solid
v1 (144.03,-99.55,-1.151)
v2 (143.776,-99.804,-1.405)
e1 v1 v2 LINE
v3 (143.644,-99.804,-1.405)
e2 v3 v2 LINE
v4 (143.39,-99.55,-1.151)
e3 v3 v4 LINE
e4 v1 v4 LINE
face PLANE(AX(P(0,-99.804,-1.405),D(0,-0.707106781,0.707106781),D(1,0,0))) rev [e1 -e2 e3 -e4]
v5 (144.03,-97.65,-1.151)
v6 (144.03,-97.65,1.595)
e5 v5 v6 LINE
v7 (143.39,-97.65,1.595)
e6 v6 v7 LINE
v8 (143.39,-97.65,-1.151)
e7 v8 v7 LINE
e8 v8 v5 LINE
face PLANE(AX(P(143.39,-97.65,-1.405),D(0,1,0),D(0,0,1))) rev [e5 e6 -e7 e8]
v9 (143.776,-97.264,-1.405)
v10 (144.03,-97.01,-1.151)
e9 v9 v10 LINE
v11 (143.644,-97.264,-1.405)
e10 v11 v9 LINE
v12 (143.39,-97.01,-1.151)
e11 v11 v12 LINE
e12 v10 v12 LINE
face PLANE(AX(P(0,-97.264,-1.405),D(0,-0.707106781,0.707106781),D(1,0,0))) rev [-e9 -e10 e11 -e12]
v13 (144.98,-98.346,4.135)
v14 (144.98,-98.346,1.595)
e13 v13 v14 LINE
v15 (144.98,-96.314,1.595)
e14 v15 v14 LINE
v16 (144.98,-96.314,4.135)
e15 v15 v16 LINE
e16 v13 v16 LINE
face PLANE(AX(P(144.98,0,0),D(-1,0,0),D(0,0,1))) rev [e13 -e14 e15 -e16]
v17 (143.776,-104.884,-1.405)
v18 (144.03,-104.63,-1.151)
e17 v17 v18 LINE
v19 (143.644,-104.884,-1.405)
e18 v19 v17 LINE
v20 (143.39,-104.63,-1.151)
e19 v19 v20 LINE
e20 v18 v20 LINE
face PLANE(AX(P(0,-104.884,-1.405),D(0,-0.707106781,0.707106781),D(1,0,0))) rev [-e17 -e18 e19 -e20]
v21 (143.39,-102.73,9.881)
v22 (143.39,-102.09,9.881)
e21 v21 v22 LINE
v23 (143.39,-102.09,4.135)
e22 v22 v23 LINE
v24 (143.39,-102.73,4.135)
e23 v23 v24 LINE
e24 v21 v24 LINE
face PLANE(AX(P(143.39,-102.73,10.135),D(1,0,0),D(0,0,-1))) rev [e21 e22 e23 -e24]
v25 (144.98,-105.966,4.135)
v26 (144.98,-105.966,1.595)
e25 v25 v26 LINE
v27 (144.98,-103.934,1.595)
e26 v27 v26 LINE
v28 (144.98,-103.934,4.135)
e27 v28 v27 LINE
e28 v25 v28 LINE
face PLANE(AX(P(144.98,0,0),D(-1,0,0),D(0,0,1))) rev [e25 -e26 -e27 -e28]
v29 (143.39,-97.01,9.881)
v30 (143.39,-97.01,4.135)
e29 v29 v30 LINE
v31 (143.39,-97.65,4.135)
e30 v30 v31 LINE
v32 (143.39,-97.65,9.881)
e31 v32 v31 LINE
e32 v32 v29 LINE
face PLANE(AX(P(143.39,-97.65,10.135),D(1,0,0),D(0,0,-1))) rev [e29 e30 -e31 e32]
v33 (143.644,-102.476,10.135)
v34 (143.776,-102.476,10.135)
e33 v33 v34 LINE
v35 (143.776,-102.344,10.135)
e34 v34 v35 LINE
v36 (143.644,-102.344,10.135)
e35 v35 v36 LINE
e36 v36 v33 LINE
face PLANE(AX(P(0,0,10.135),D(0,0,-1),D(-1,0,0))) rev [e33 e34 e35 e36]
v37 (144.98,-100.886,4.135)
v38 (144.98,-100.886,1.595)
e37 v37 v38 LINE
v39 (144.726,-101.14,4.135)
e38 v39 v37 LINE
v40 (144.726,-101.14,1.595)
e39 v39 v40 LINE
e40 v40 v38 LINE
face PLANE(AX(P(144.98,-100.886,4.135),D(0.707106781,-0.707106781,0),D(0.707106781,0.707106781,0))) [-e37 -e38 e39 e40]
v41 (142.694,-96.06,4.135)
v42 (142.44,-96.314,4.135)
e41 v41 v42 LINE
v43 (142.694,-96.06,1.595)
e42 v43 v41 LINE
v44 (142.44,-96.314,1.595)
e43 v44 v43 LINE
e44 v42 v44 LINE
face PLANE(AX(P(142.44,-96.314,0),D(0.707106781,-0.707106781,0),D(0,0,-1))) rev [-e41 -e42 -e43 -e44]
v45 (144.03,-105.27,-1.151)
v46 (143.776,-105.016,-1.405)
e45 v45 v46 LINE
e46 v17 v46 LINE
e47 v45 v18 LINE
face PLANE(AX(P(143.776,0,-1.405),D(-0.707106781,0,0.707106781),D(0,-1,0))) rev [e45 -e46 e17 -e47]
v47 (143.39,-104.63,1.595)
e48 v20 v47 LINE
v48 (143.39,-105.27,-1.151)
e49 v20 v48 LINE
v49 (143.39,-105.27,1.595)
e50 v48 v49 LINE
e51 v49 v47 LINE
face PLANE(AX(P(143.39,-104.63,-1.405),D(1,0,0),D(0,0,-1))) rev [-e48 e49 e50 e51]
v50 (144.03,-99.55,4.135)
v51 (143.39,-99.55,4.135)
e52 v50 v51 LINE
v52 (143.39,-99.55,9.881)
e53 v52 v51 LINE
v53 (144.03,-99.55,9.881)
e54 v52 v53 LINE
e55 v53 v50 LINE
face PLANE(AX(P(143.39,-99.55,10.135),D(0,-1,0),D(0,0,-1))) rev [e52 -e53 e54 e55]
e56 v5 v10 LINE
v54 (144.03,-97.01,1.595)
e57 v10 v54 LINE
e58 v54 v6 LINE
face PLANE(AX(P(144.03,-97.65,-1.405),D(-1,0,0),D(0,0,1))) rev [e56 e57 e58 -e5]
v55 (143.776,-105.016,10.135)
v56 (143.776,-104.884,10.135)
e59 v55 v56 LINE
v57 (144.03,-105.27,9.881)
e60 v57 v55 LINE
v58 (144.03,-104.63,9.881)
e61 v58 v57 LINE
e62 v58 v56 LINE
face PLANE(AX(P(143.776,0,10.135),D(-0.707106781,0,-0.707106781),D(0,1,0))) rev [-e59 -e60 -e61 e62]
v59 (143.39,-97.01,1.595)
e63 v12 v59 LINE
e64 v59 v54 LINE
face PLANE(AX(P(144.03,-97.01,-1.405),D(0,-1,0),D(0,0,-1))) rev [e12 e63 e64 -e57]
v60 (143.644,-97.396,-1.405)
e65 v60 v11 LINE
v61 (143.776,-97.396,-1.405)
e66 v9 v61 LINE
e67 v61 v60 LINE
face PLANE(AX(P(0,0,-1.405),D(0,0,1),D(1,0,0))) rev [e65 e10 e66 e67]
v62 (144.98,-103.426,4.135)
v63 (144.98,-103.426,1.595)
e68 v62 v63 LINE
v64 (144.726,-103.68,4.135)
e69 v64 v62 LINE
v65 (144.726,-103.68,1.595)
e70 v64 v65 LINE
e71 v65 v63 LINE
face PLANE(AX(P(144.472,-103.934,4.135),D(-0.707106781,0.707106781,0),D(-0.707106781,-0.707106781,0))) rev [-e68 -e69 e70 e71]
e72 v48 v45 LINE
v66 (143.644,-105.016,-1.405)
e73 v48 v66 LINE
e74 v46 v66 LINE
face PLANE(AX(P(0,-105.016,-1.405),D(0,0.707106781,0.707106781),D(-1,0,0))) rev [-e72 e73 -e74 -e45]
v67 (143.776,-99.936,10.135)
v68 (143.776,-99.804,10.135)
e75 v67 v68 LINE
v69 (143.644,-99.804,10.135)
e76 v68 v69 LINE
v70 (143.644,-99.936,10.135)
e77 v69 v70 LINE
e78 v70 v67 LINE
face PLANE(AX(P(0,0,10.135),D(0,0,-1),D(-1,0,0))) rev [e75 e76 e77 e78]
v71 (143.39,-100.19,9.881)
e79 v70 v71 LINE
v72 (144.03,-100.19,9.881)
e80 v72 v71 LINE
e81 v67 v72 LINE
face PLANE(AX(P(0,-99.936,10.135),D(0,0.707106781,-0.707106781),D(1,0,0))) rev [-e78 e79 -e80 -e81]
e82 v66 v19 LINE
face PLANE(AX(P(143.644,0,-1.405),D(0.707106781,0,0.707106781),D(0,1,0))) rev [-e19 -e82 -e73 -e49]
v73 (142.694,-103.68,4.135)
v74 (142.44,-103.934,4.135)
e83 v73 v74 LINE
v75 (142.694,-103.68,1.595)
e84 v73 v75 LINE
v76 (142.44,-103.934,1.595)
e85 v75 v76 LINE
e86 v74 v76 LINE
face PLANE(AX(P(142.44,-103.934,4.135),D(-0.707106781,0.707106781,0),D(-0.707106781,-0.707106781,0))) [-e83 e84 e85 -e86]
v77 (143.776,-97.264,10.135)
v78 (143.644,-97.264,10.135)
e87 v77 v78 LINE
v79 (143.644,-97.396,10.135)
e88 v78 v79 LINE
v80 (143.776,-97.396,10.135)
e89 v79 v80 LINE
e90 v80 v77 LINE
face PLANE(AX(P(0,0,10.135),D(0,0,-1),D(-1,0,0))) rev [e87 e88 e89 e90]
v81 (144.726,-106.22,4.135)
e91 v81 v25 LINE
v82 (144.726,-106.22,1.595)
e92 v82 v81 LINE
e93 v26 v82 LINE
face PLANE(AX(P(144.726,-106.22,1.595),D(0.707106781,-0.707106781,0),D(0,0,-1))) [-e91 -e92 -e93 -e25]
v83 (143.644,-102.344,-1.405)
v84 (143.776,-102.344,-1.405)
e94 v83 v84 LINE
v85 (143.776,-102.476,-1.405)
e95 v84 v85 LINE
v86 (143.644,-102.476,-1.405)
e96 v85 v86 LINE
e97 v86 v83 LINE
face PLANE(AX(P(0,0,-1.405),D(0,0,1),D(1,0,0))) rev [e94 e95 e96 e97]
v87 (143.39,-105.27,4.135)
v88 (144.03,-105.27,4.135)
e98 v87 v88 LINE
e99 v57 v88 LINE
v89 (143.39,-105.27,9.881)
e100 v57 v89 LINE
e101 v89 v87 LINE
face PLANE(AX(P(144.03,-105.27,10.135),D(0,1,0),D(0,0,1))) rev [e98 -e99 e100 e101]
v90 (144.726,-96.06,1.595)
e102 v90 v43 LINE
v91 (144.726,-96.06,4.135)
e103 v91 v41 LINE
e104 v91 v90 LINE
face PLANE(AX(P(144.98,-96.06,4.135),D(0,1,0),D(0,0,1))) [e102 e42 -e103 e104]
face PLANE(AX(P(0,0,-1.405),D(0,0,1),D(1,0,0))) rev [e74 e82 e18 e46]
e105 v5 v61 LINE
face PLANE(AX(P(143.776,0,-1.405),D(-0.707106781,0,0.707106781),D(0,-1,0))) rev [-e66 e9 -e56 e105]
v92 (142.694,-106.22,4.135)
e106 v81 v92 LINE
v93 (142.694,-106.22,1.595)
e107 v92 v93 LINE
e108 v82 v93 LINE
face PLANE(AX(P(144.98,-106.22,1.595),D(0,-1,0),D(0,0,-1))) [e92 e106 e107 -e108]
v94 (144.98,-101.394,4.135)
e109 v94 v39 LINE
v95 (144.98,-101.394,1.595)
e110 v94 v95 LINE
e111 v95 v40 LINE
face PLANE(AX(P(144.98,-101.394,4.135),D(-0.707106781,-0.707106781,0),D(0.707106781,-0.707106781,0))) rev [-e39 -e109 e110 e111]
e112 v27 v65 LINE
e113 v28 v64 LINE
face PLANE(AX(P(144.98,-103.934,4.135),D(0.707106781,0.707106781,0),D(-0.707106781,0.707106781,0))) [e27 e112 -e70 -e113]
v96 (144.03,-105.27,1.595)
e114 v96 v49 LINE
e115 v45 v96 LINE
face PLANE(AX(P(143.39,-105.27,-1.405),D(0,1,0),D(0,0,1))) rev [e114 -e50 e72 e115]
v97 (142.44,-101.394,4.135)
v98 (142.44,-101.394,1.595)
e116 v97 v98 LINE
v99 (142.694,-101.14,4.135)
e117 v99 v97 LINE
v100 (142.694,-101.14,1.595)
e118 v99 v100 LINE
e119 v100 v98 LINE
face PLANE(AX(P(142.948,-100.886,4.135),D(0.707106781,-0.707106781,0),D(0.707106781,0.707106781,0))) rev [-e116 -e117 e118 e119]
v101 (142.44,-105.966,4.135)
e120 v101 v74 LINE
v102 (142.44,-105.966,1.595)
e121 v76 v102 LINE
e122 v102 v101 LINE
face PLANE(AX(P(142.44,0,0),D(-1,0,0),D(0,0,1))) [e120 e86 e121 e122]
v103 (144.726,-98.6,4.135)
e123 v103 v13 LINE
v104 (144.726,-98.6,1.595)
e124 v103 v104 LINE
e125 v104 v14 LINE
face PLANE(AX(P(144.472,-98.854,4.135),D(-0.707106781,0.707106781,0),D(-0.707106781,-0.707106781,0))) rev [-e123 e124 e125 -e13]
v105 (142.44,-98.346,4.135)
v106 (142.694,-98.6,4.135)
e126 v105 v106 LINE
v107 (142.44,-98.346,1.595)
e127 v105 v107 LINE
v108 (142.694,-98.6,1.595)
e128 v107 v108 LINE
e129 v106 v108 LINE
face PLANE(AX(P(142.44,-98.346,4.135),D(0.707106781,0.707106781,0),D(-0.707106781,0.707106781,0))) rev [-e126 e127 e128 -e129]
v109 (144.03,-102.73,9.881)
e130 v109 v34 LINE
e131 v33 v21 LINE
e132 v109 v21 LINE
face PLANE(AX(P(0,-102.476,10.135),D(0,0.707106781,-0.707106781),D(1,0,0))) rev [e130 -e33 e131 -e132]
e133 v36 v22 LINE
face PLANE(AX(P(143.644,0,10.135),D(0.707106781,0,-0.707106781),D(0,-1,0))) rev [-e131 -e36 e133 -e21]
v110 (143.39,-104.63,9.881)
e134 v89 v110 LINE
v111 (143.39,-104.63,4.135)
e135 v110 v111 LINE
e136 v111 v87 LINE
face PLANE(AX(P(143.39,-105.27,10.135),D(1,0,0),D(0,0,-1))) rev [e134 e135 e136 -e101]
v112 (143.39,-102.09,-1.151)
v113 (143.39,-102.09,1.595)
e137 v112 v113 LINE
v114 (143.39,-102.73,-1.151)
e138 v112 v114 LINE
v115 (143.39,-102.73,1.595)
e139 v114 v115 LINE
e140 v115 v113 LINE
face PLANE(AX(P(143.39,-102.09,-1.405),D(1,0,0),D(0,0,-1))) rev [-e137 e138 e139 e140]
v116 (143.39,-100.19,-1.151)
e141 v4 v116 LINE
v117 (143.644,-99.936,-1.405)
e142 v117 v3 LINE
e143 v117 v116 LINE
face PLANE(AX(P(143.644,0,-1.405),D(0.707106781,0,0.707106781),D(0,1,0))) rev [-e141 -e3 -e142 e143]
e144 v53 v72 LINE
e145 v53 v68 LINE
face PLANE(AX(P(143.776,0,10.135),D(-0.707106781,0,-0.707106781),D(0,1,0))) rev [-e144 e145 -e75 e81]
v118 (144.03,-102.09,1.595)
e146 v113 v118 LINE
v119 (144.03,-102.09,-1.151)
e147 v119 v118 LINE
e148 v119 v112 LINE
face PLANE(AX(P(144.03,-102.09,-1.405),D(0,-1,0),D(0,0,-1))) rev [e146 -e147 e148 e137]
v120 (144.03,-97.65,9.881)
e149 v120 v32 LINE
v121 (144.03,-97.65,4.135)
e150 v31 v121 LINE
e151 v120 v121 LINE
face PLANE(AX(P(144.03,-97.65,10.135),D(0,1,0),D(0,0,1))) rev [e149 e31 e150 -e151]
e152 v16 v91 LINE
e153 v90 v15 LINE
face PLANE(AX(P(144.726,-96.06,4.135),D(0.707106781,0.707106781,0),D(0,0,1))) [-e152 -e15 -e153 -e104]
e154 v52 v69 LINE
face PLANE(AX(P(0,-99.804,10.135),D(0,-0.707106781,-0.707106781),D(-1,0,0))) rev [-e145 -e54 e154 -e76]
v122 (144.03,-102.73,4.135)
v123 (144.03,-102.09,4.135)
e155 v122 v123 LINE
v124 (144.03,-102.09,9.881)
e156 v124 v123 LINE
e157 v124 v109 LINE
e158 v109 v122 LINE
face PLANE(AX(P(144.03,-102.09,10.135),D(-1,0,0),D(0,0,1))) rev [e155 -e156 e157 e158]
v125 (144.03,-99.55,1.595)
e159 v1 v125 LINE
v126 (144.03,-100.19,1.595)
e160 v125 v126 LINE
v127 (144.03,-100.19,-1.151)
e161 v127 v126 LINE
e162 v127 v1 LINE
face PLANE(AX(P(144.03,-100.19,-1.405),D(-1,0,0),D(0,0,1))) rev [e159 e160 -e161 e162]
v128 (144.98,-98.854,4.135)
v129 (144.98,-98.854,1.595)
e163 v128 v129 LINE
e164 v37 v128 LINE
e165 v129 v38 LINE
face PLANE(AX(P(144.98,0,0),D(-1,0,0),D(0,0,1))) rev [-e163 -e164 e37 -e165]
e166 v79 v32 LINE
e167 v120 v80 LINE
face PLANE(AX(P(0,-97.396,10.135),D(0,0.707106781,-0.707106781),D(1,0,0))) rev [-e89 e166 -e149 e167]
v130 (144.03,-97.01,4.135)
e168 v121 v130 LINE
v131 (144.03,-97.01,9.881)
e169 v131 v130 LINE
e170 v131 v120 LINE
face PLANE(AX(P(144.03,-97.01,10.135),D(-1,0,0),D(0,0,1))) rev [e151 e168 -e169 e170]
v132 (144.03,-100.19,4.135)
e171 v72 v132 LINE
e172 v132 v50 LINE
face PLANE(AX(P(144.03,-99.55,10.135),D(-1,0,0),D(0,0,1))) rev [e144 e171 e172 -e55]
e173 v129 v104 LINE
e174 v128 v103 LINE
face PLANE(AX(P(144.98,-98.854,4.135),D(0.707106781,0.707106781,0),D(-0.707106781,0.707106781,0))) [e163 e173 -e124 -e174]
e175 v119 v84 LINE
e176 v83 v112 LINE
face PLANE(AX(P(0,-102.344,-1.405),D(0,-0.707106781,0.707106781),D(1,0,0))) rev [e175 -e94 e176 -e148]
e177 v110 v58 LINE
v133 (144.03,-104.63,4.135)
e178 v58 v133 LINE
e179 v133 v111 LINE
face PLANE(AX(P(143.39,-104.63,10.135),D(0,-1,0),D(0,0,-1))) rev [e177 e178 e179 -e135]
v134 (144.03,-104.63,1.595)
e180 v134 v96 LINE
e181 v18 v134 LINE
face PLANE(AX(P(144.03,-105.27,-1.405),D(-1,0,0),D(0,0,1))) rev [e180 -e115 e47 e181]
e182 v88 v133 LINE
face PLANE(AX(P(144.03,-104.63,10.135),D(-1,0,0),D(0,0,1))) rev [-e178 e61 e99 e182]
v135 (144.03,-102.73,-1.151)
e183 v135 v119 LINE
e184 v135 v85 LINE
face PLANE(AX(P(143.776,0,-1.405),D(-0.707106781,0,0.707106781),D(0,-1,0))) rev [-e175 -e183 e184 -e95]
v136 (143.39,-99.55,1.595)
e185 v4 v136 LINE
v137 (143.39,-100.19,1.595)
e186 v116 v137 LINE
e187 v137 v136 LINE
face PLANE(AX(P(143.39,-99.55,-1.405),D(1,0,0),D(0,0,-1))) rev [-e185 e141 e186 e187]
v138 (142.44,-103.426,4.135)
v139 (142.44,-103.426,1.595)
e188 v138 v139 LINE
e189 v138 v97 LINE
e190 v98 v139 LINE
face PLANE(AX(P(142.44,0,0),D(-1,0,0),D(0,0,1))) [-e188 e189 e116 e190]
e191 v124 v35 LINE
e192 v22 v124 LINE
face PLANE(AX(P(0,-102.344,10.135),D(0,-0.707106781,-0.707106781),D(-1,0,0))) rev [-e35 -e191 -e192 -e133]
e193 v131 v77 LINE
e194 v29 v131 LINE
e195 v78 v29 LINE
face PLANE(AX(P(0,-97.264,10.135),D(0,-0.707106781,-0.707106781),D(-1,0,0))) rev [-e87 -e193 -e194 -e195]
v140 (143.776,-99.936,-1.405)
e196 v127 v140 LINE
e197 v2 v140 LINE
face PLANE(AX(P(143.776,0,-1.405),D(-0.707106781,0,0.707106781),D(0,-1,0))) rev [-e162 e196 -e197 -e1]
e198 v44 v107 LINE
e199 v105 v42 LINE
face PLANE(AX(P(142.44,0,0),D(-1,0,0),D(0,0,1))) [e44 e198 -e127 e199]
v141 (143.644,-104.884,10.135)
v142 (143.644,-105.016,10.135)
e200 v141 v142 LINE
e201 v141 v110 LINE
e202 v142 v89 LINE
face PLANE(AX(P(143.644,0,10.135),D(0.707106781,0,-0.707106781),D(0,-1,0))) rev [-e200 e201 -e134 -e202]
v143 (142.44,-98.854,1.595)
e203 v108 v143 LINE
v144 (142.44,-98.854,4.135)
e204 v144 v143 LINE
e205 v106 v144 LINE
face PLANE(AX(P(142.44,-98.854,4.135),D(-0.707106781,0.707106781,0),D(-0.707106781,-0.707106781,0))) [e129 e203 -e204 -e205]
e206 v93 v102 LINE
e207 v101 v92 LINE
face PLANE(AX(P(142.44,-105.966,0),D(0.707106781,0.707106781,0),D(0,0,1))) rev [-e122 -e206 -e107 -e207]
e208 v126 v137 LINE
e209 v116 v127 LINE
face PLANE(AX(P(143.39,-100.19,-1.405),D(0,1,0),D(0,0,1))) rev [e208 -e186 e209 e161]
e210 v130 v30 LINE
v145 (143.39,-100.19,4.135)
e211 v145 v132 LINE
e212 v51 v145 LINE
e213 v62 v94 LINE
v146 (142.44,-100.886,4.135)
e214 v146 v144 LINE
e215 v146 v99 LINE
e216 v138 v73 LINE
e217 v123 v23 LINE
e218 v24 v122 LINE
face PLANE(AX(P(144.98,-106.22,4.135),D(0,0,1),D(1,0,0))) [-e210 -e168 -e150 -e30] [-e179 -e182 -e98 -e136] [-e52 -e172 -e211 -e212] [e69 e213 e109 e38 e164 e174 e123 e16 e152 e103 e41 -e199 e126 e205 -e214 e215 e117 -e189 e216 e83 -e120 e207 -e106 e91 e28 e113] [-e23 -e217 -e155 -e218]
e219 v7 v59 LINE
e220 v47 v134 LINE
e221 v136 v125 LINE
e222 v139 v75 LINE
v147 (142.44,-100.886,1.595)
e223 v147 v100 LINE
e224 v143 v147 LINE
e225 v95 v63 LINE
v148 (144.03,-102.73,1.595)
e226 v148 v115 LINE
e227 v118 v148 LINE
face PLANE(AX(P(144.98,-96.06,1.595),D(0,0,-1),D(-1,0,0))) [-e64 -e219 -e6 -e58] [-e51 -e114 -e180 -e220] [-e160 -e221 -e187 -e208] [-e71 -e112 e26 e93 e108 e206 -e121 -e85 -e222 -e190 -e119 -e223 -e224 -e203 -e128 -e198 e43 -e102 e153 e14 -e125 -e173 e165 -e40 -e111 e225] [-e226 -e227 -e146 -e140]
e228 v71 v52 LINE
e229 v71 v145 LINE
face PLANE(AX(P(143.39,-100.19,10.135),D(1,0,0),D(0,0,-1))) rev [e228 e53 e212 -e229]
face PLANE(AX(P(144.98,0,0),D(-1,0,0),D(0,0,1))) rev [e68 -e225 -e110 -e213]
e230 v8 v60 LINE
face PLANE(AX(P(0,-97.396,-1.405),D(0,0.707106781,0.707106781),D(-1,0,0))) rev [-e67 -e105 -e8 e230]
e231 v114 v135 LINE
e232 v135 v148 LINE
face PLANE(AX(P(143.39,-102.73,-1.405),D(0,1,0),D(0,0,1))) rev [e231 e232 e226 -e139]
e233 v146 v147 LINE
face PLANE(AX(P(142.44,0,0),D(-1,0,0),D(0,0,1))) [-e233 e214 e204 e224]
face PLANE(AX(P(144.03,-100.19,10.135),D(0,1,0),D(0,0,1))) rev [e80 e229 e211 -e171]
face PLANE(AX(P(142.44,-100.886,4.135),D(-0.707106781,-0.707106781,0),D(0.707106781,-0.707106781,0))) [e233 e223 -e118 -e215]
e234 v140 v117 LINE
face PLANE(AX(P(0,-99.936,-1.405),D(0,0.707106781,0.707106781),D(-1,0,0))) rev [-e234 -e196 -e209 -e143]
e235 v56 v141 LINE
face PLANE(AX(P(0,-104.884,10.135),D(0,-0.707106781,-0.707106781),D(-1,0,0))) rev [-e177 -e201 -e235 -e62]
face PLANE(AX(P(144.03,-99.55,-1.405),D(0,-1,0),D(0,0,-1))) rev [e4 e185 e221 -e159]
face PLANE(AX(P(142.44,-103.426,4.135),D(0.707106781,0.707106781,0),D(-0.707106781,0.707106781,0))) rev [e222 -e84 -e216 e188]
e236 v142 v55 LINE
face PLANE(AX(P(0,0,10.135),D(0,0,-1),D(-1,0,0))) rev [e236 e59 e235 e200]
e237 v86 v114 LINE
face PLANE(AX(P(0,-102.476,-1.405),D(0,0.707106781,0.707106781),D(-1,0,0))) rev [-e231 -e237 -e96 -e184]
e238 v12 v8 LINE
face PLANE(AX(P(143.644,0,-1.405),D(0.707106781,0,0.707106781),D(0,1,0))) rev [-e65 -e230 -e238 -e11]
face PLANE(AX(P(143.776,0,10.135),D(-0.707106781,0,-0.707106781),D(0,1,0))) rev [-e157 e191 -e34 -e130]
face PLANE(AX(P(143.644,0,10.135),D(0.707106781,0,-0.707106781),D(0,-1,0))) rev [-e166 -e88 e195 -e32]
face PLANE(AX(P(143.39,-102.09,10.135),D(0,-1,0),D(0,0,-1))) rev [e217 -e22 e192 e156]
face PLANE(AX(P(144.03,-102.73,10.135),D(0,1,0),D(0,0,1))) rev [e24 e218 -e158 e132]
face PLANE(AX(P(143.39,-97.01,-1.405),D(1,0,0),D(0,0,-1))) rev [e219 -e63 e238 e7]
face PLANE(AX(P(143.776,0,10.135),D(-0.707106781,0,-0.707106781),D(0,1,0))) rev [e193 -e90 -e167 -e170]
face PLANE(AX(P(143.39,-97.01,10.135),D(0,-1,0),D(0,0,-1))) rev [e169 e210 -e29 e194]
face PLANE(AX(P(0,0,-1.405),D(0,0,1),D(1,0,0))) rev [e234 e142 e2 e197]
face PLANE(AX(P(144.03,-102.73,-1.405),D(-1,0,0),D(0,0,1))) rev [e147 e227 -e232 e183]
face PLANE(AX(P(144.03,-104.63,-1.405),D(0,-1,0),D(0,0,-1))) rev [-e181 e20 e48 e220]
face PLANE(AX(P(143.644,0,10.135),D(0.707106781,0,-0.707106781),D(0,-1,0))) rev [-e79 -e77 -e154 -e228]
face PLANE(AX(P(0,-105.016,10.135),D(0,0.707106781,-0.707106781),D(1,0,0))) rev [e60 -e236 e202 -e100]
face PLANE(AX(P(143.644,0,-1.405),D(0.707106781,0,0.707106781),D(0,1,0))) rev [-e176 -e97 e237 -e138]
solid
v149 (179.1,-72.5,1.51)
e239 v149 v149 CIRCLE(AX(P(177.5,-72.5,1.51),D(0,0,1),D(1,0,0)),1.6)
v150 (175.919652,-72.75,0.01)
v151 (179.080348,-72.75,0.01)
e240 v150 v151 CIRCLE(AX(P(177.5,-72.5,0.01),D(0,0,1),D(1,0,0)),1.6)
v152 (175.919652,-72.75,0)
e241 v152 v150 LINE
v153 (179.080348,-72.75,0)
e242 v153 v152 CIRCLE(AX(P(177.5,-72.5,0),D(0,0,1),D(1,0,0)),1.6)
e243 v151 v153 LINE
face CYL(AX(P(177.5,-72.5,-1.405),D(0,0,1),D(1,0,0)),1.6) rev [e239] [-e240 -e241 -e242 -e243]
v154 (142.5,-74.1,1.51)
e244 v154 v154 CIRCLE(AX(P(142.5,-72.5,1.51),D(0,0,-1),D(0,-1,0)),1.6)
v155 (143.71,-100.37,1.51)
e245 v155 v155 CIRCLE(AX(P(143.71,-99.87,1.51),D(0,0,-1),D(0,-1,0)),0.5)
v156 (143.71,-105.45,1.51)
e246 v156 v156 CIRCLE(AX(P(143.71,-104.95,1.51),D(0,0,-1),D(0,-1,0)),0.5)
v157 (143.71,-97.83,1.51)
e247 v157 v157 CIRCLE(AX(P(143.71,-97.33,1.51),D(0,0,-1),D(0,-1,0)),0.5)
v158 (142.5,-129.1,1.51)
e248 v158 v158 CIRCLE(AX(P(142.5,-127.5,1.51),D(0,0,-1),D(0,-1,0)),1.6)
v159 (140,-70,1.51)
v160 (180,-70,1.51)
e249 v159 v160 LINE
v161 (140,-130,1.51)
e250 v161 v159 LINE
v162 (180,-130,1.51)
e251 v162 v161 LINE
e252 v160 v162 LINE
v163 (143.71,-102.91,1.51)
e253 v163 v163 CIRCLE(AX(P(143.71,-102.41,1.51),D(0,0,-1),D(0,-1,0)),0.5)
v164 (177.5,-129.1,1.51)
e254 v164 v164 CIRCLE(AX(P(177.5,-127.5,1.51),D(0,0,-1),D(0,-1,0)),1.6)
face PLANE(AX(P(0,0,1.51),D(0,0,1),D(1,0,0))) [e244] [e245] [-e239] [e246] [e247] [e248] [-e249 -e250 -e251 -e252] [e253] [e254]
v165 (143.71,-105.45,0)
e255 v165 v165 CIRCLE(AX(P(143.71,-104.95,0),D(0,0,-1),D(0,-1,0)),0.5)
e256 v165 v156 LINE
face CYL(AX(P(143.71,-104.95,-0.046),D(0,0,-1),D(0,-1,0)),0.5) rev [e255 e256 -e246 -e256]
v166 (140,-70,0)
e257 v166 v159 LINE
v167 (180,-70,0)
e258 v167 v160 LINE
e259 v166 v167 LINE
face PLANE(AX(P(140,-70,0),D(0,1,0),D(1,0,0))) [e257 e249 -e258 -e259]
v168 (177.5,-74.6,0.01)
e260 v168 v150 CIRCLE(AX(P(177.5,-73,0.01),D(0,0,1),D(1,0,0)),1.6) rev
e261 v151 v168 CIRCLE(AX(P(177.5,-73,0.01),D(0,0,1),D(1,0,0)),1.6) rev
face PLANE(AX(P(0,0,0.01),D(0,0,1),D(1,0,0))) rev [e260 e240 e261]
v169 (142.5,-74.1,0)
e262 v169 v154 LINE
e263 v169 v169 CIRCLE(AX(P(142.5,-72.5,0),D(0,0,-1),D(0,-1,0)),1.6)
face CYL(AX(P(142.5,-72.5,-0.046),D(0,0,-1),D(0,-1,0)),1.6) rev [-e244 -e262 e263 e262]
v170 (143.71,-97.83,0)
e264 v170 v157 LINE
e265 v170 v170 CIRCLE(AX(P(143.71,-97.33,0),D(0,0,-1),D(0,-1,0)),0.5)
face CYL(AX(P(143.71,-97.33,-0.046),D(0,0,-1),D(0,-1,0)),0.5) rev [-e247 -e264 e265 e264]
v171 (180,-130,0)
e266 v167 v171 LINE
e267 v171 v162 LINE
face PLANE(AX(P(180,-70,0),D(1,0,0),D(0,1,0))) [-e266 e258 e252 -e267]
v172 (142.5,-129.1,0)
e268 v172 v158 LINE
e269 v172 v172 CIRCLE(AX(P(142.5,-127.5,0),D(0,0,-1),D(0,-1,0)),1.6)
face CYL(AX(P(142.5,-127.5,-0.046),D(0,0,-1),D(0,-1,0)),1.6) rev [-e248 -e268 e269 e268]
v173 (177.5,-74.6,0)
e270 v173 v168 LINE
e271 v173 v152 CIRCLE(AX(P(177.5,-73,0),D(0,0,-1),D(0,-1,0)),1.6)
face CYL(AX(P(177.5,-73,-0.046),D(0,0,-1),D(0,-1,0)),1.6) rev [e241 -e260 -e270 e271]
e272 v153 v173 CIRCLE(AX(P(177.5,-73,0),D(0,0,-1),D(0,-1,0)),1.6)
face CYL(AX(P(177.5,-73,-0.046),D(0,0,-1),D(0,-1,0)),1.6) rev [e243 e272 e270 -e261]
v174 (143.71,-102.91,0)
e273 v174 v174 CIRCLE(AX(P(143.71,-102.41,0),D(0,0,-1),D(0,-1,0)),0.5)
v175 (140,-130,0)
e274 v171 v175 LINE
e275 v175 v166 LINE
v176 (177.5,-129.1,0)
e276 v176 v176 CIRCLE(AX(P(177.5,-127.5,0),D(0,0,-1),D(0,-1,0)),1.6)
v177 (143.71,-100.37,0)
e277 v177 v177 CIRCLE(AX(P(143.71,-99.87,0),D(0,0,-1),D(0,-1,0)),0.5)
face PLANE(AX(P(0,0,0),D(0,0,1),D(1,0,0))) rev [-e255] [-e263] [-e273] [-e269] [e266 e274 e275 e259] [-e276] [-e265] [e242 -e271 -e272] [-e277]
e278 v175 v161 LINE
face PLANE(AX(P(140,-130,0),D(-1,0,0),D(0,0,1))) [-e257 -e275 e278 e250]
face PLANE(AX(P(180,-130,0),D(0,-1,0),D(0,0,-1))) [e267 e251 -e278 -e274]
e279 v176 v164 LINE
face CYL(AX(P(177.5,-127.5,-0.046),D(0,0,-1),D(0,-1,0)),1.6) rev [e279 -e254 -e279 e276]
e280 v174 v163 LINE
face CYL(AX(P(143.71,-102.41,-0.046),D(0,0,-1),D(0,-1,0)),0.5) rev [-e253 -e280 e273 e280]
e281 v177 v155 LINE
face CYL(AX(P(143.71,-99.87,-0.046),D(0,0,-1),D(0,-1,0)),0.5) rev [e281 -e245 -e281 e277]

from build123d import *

# Parameters (mm, degrees)
SKETCH1_W                  = 10.16
SKETCH1_H                  = 2.54
BOSS_EXTRUDE1_DEPTH        = 2.54
CUT_EXTRUDE1_DEPTH         = 180.745209672
CUT_EXTRUDE2_DEPTH         = 180.745209672
CUT_EXTRUDE3_DEPTH         = 180.745209672
CUT_EXTRUDE4_DEPTH         = 180.745209672
CUT_EXTRUDE5_DEPTH         = 180.745209672
CUT_EXTRUDE6_DEPTH         = 180.745209672
SKETCH8_W                  = 0.64
SKETCH8_H                  = 0.64
BOSS_EXTRUDE2_DEPTH        = 6
SKETCH9_W                  = 0.64
SKETCH9_H                  = 0.64
BOSS_EXTRUDE3_DEPTH        = 6
SKETCH10_W                 = 0.64
SKETCH10_H                 = 0.64
BOSS_EXTRUDE4_DEPTH        = 6
SKETCH11_W                 = 0.64
SKETCH11_H                 = 0.64
BOSS_EXTRUDE5_DEPTH        = 6
SKETCH12_W                 = 0.64
SKETCH12_H                 = 0.64
BOSS_EXTRUDE6_DEPTH        = 3
SKETCH13_W                 = 0.64
SKETCH13_H                 = 0.64
BOSS_EXTRUDE7_DEPTH        = 3
SKETCH14_W                 = 0.64
SKETCH14_H                 = 0.64
BOSS_EXTRUDE8_DEPTH        = 3
SKETCH15_W                 = 0.64
SKETCH15_H                 = 0.64
BOSS_EXTRUDE9_DEPTH        = 3
DRAFT1_ANGLE               = 45
DRAFT2_ANGLE               = 45
DRAFT3_ANGLE               = 45
DRAFT4_ANGLE               = 45
CHAMFER1_SIZE              = 0.254
BOSS_EXTRUDE10_START       = -1.51
BOSS_EXTRUDE10_OUTLINE_W   = 40
BOSS_EXTRUDE10_OUTLINE_H   = 60
BOSS_EXTRUDE10_OUTLINE_R   = 1.6
BOSS_EXTRUDE10_OUTLINE_R_2 = 0.5
BOSS_EXTRUDE10_DEPTH       = 1.51
BOSS_EXTRUDE10_START_2     = -1.5
BOSS_EXTRUDE10_2_OUTLINE_R = 1.6
BOSS_EXTRUDE10_2_DEPTH     = 1.5
SKETCH18_R                 = 1.6
CUT_EXTRUDE8_DEPTH         = 223.203489228


# Read off the part's stored shape, not the designer's step: Boss-Extrude10
with BuildPart() as part:
    # Sketch1 → Boss-Extrude1 (new body)
    with BuildSketch(Plane(origin=(142.44, 0, 0), x_dir=(0, -1, 0), z_dir=(-1, 0, 0))):
        with Locations((101.14, 2.865)):
            Rectangle(SKETCH1_W, SKETCH1_H)
    extrude(amount=-BOSS_EXTRUDE1_DEPTH)

    # Sketch2 → Cut-Extrude1 (cut, through all)
    with BuildSketch(Plane(origin=(0, 0, 1.595), x_dir=(-1, 0, 0), z_dir=(0, 0, -1))):
        Polygon((-144.98, -103.426), (-144.98, -103.934), (-144.472, -103.934), align=None)
    extrude(amount=-CUT_EXTRUDE1_DEPTH, mode=Mode.SUBTRACT)

    # Sketch3 → Cut-Extrude2 (cut, through all)
    with BuildSketch(Plane(origin=(0, 0, 1.595), x_dir=(-1, 0, 0), z_dir=(0, 0, -1))):
        Polygon((-144.98, -100.886), (-144.98, -101.394), (-144.472, -100.886), align=None)
    extrude(amount=-CUT_EXTRUDE2_DEPTH, mode=Mode.SUBTRACT)

    # Sketch4 → Cut-Extrude3 (cut, through all)
    with BuildSketch(Plane(origin=(0, 0, 1.595), x_dir=(-1, 0, 0), z_dir=(0, 0, -1))):
        Polygon((-144.98, -98.346), (-144.98, -98.854), (-144.472, -98.854), align=None)
    extrude(amount=-CUT_EXTRUDE3_DEPTH, mode=Mode.SUBTRACT)

    # Sketch5 → Cut-Extrude4 (cut, through all)
    with BuildSketch(Plane(origin=(0, 0, 1.595), x_dir=(-1, 0, 0), z_dir=(0, 0, -1))):
        Polygon((-142.44, -98.854), (-142.44, -98.346), (-142.948, -98.854), align=None)
    extrude(amount=-CUT_EXTRUDE4_DEPTH, mode=Mode.SUBTRACT)

    # Sketch6 → Cut-Extrude5 (cut, through all)
    with BuildSketch(Plane(origin=(0, 0, 1.595), x_dir=(-1, 0, 0), z_dir=(0, 0, -1))):
        Polygon((-142.44, -101.394), (-142.44, -100.886), (-142.948, -100.886), align=None)
    extrude(amount=-CUT_EXTRUDE5_DEPTH, mode=Mode.SUBTRACT)

    # Sketch7 → Cut-Extrude6 (cut, through all)
    with BuildSketch(Plane(origin=(0, 0, 1.595), x_dir=(-1, 0, 0), z_dir=(0, 0, -1))):
        Polygon((-142.44, -103.934), (-142.44, -103.426), (-142.948, -103.934), align=None)
    extrude(amount=-CUT_EXTRUDE6_DEPTH, mode=Mode.SUBTRACT)

    # Sketch8 → Boss-Extrude2 (add)
    with BuildSketch(Plane.XY.offset(4.135)):
        with Locations((143.71, -102.41)):
            Rectangle(SKETCH8_W, SKETCH8_H)
    extrude(amount=BOSS_EXTRUDE2_DEPTH)

    # Sketch9 → Boss-Extrude3 (add)
    with BuildSketch(Plane.XY.offset(4.135)):
        with Locations((143.71, -104.95)):
            Rectangle(SKETCH9_W, SKETCH9_H)
    extrude(amount=BOSS_EXTRUDE3_DEPTH)

    # Sketch10 → Boss-Extrude4 (add)
    with BuildSketch(Plane.XY.offset(4.135)):
        with Locations((143.71, -97.33)):
            Rectangle(SKETCH10_W, SKETCH10_H)
    extrude(amount=BOSS_EXTRUDE4_DEPTH)

    # Sketch11 → Boss-Extrude5 (add)
    with BuildSketch(Plane.XY.offset(4.135)):
        with Locations((143.71, -99.87)):
            Rectangle(SKETCH11_W, SKETCH11_H)
    extrude(amount=BOSS_EXTRUDE5_DEPTH)

    # Sketch12 → Boss-Extrude6 (add)
    with BuildSketch(Plane(origin=(0, 0, 1.595), x_dir=(-1, 0, 0), z_dir=(0, 0, -1))):
        with Locations((-143.71, -102.41)):
            Rectangle(SKETCH12_W, SKETCH12_H)
    extrude(amount=BOSS_EXTRUDE6_DEPTH)

    # Sketch13 → Boss-Extrude7 (add)
    with BuildSketch(Plane(origin=(0, 0, 1.595), x_dir=(-1, 0, 0), z_dir=(0, 0, -1))):
        with Locations((-143.71, -104.95)):
            Rectangle(SKETCH13_W, SKETCH13_H)
    extrude(amount=BOSS_EXTRUDE7_DEPTH)

    # Sketch14 → Boss-Extrude8 (add)
    with BuildSketch(Plane(origin=(0, 0, 1.595), x_dir=(-1, 0, 0), z_dir=(0, 0, -1))):
        with Locations((-143.71, -97.33)):
            Rectangle(SKETCH14_W, SKETCH14_H)
    extrude(amount=BOSS_EXTRUDE8_DEPTH)

    # Sketch15 → Boss-Extrude9 (add)
    with BuildSketch(Plane(origin=(0, 0, 1.595), x_dir=(-1, 0, 0), z_dir=(0, 0, -1))):
        with Locations((-143.71, -99.87)):
            Rectangle(SKETCH15_W, SKETCH15_H)
    extrude(amount=BOSS_EXTRUDE9_DEPTH)

    # Draft1
    draft1_faces = [part.faces().sort_by_distance(p)[0] for p in [
        (144.726, -103.934, 2.865),
    ]]
    draft(draft1_faces, Plane(origin=(144.98, 0, 0), x_dir=(0, 0, 1), z_dir=(1, 0, 0)), DRAFT1_ANGLE)

    # Draft2
    draft2_faces = [part.faces().sort_by_distance(p)[0] for p in [
        (142.694, -103.934, 2.865),
    ]]
    draft(draft2_faces, Plane(origin=(142.44, 0, 0), x_dir=(0, 0, -1), z_dir=(-1, 0, 0)), DRAFT2_ANGLE)

    # Draft3
    draft3_faces = [part.faces().sort_by_distance(p)[0] for p in [
        (144.726, -100.886, 2.865),
        (144.726, -98.854, 2.865),
    ]]
    draft(draft3_faces, Plane(origin=(144.98, 0, 0), x_dir=(0, 0, 1), z_dir=(1, 0, 0)), DRAFT3_ANGLE)

    # Draft4
    draft4_faces = [part.faces().sort_by_distance(p)[0] for p in [
        (142.694, -98.854, 2.865),
        (142.694, -100.886, 2.865),
    ]]
    draft(draft4_faces, Plane(origin=(142.44, 0, 0), x_dir=(0, 0, -1), z_dir=(-1, 0, 0)), DRAFT4_ANGLE)

    # Chamfer1
    chamfer1_edges = [part.edges().sort_by_distance(p)[0] for p in [
        (143.71, -102.09, 10.135),
        (143.39, -102.41, 10.135),
        (143.71, -102.73, 10.135),
        (144.03, -102.41, 10.135),
        (143.71, -104.63, 10.135),
        (143.39, -104.95, 10.135),
        (143.71, -105.27, 10.135),
        (144.03, -104.95, 10.135),
        (144.98, -106.22, 2.865),
        (143.71, -97.01, 10.135),
        (143.39, -97.33, 10.135),
        (143.71, -97.65, 10.135),
        (144.03, -97.33, 10.135),
        (143.39, -99.87, 10.135),
        (143.71, -100.19, 10.135),
        (144.03, -99.87, 10.135),
        (143.71, -99.55, 10.135),
        (143.71, -102.73, -1.405),
        (143.39, -102.41, -1.405),
        (143.71, -102.09, -1.405),
        (144.03, -102.41, -1.405),
        (143.39, -104.95, -1.405),
        (143.71, -104.63, -1.405),
        (144.03, -104.95, -1.405),
        (143.71, -105.27, -1.405),
        (143.39, -97.33, -1.405),
        (143.71, -97.01, -1.405),
        (144.03, -97.33, -1.405),
        (143.71, -97.65, -1.405),
        (143.71, -100.19, -1.405),
        (143.39, -99.87, -1.405),
        (143.71, -99.55, -1.405),
        (144.03, -99.87, -1.405),
        (144.98, -96.06, 2.865),
        (142.44, -106.22, 2.865),
        (142.44, -96.06, 2.865),
    ]]
    chamfer(chamfer1_edges, length=CHAMFER1_SIZE)


with BuildPart() as body_2:
    # Boss-Extrude10 outline → Boss-Extrude10 (new body)
    with BuildSketch(Plane.XY.offset(1.51).offset(BOSS_EXTRUDE10_START)):
        with Locations((160, -100)):
            Rectangle(BOSS_EXTRUDE10_OUTLINE_W, BOSS_EXTRUDE10_OUTLINE_H)
        with Locations((142.5, -127.5)):
            Circle(BOSS_EXTRUDE10_OUTLINE_R, mode=Mode.SUBTRACT)
        with Locations((143.71, -104.95)):
            Circle(BOSS_EXTRUDE10_OUTLINE_R_2, mode=Mode.SUBTRACT)
        with Locations((143.71, -102.41)):
            Circle(BOSS_EXTRUDE10_OUTLINE_R_2, mode=Mode.SUBTRACT)
        with Locations((177.5, -127.5)):
            Circle(BOSS_EXTRUDE10_OUTLINE_R, mode=Mode.SUBTRACT)
        with Locations((143.71, -99.87)):
            Circle(BOSS_EXTRUDE10_OUTLINE_R_2, mode=Mode.SUBTRACT)
        with Locations((143.71, -97.33)):
            Circle(BOSS_EXTRUDE10_OUTLINE_R_2, mode=Mode.SUBTRACT)
        with Locations((142.5, -72.5)):
            Circle(BOSS_EXTRUDE10_OUTLINE_R, mode=Mode.SUBTRACT)
        with Locations((177.5, -73)):
            Circle(BOSS_EXTRUDE10_OUTLINE_R, mode=Mode.SUBTRACT)
    extrude(amount=BOSS_EXTRUDE10_DEPTH)

    # Boss-Extrude10 2 outline → Boss-Extrude10 2 (add)
    with BuildSketch(Plane.XY.offset(1.51).offset(BOSS_EXTRUDE10_START_2)):
        with Locations((177.5, -73)):
            Circle(BOSS_EXTRUDE10_2_OUTLINE_R)
    extrude(amount=BOSS_EXTRUDE10_2_DEPTH)

    # Sketch18 → Cut-Extrude8 (cut, through all)
    with BuildSketch(Plane.XY.offset(1.51)):
        with Locations((177.5, -72.5)):
            Circle(SKETCH18_R)
    extrude(amount=-CUT_EXTRUDE8_DEPTH, mode=Mode.SUBTRACT)


solid = Compound([part.part, body_2.part])
